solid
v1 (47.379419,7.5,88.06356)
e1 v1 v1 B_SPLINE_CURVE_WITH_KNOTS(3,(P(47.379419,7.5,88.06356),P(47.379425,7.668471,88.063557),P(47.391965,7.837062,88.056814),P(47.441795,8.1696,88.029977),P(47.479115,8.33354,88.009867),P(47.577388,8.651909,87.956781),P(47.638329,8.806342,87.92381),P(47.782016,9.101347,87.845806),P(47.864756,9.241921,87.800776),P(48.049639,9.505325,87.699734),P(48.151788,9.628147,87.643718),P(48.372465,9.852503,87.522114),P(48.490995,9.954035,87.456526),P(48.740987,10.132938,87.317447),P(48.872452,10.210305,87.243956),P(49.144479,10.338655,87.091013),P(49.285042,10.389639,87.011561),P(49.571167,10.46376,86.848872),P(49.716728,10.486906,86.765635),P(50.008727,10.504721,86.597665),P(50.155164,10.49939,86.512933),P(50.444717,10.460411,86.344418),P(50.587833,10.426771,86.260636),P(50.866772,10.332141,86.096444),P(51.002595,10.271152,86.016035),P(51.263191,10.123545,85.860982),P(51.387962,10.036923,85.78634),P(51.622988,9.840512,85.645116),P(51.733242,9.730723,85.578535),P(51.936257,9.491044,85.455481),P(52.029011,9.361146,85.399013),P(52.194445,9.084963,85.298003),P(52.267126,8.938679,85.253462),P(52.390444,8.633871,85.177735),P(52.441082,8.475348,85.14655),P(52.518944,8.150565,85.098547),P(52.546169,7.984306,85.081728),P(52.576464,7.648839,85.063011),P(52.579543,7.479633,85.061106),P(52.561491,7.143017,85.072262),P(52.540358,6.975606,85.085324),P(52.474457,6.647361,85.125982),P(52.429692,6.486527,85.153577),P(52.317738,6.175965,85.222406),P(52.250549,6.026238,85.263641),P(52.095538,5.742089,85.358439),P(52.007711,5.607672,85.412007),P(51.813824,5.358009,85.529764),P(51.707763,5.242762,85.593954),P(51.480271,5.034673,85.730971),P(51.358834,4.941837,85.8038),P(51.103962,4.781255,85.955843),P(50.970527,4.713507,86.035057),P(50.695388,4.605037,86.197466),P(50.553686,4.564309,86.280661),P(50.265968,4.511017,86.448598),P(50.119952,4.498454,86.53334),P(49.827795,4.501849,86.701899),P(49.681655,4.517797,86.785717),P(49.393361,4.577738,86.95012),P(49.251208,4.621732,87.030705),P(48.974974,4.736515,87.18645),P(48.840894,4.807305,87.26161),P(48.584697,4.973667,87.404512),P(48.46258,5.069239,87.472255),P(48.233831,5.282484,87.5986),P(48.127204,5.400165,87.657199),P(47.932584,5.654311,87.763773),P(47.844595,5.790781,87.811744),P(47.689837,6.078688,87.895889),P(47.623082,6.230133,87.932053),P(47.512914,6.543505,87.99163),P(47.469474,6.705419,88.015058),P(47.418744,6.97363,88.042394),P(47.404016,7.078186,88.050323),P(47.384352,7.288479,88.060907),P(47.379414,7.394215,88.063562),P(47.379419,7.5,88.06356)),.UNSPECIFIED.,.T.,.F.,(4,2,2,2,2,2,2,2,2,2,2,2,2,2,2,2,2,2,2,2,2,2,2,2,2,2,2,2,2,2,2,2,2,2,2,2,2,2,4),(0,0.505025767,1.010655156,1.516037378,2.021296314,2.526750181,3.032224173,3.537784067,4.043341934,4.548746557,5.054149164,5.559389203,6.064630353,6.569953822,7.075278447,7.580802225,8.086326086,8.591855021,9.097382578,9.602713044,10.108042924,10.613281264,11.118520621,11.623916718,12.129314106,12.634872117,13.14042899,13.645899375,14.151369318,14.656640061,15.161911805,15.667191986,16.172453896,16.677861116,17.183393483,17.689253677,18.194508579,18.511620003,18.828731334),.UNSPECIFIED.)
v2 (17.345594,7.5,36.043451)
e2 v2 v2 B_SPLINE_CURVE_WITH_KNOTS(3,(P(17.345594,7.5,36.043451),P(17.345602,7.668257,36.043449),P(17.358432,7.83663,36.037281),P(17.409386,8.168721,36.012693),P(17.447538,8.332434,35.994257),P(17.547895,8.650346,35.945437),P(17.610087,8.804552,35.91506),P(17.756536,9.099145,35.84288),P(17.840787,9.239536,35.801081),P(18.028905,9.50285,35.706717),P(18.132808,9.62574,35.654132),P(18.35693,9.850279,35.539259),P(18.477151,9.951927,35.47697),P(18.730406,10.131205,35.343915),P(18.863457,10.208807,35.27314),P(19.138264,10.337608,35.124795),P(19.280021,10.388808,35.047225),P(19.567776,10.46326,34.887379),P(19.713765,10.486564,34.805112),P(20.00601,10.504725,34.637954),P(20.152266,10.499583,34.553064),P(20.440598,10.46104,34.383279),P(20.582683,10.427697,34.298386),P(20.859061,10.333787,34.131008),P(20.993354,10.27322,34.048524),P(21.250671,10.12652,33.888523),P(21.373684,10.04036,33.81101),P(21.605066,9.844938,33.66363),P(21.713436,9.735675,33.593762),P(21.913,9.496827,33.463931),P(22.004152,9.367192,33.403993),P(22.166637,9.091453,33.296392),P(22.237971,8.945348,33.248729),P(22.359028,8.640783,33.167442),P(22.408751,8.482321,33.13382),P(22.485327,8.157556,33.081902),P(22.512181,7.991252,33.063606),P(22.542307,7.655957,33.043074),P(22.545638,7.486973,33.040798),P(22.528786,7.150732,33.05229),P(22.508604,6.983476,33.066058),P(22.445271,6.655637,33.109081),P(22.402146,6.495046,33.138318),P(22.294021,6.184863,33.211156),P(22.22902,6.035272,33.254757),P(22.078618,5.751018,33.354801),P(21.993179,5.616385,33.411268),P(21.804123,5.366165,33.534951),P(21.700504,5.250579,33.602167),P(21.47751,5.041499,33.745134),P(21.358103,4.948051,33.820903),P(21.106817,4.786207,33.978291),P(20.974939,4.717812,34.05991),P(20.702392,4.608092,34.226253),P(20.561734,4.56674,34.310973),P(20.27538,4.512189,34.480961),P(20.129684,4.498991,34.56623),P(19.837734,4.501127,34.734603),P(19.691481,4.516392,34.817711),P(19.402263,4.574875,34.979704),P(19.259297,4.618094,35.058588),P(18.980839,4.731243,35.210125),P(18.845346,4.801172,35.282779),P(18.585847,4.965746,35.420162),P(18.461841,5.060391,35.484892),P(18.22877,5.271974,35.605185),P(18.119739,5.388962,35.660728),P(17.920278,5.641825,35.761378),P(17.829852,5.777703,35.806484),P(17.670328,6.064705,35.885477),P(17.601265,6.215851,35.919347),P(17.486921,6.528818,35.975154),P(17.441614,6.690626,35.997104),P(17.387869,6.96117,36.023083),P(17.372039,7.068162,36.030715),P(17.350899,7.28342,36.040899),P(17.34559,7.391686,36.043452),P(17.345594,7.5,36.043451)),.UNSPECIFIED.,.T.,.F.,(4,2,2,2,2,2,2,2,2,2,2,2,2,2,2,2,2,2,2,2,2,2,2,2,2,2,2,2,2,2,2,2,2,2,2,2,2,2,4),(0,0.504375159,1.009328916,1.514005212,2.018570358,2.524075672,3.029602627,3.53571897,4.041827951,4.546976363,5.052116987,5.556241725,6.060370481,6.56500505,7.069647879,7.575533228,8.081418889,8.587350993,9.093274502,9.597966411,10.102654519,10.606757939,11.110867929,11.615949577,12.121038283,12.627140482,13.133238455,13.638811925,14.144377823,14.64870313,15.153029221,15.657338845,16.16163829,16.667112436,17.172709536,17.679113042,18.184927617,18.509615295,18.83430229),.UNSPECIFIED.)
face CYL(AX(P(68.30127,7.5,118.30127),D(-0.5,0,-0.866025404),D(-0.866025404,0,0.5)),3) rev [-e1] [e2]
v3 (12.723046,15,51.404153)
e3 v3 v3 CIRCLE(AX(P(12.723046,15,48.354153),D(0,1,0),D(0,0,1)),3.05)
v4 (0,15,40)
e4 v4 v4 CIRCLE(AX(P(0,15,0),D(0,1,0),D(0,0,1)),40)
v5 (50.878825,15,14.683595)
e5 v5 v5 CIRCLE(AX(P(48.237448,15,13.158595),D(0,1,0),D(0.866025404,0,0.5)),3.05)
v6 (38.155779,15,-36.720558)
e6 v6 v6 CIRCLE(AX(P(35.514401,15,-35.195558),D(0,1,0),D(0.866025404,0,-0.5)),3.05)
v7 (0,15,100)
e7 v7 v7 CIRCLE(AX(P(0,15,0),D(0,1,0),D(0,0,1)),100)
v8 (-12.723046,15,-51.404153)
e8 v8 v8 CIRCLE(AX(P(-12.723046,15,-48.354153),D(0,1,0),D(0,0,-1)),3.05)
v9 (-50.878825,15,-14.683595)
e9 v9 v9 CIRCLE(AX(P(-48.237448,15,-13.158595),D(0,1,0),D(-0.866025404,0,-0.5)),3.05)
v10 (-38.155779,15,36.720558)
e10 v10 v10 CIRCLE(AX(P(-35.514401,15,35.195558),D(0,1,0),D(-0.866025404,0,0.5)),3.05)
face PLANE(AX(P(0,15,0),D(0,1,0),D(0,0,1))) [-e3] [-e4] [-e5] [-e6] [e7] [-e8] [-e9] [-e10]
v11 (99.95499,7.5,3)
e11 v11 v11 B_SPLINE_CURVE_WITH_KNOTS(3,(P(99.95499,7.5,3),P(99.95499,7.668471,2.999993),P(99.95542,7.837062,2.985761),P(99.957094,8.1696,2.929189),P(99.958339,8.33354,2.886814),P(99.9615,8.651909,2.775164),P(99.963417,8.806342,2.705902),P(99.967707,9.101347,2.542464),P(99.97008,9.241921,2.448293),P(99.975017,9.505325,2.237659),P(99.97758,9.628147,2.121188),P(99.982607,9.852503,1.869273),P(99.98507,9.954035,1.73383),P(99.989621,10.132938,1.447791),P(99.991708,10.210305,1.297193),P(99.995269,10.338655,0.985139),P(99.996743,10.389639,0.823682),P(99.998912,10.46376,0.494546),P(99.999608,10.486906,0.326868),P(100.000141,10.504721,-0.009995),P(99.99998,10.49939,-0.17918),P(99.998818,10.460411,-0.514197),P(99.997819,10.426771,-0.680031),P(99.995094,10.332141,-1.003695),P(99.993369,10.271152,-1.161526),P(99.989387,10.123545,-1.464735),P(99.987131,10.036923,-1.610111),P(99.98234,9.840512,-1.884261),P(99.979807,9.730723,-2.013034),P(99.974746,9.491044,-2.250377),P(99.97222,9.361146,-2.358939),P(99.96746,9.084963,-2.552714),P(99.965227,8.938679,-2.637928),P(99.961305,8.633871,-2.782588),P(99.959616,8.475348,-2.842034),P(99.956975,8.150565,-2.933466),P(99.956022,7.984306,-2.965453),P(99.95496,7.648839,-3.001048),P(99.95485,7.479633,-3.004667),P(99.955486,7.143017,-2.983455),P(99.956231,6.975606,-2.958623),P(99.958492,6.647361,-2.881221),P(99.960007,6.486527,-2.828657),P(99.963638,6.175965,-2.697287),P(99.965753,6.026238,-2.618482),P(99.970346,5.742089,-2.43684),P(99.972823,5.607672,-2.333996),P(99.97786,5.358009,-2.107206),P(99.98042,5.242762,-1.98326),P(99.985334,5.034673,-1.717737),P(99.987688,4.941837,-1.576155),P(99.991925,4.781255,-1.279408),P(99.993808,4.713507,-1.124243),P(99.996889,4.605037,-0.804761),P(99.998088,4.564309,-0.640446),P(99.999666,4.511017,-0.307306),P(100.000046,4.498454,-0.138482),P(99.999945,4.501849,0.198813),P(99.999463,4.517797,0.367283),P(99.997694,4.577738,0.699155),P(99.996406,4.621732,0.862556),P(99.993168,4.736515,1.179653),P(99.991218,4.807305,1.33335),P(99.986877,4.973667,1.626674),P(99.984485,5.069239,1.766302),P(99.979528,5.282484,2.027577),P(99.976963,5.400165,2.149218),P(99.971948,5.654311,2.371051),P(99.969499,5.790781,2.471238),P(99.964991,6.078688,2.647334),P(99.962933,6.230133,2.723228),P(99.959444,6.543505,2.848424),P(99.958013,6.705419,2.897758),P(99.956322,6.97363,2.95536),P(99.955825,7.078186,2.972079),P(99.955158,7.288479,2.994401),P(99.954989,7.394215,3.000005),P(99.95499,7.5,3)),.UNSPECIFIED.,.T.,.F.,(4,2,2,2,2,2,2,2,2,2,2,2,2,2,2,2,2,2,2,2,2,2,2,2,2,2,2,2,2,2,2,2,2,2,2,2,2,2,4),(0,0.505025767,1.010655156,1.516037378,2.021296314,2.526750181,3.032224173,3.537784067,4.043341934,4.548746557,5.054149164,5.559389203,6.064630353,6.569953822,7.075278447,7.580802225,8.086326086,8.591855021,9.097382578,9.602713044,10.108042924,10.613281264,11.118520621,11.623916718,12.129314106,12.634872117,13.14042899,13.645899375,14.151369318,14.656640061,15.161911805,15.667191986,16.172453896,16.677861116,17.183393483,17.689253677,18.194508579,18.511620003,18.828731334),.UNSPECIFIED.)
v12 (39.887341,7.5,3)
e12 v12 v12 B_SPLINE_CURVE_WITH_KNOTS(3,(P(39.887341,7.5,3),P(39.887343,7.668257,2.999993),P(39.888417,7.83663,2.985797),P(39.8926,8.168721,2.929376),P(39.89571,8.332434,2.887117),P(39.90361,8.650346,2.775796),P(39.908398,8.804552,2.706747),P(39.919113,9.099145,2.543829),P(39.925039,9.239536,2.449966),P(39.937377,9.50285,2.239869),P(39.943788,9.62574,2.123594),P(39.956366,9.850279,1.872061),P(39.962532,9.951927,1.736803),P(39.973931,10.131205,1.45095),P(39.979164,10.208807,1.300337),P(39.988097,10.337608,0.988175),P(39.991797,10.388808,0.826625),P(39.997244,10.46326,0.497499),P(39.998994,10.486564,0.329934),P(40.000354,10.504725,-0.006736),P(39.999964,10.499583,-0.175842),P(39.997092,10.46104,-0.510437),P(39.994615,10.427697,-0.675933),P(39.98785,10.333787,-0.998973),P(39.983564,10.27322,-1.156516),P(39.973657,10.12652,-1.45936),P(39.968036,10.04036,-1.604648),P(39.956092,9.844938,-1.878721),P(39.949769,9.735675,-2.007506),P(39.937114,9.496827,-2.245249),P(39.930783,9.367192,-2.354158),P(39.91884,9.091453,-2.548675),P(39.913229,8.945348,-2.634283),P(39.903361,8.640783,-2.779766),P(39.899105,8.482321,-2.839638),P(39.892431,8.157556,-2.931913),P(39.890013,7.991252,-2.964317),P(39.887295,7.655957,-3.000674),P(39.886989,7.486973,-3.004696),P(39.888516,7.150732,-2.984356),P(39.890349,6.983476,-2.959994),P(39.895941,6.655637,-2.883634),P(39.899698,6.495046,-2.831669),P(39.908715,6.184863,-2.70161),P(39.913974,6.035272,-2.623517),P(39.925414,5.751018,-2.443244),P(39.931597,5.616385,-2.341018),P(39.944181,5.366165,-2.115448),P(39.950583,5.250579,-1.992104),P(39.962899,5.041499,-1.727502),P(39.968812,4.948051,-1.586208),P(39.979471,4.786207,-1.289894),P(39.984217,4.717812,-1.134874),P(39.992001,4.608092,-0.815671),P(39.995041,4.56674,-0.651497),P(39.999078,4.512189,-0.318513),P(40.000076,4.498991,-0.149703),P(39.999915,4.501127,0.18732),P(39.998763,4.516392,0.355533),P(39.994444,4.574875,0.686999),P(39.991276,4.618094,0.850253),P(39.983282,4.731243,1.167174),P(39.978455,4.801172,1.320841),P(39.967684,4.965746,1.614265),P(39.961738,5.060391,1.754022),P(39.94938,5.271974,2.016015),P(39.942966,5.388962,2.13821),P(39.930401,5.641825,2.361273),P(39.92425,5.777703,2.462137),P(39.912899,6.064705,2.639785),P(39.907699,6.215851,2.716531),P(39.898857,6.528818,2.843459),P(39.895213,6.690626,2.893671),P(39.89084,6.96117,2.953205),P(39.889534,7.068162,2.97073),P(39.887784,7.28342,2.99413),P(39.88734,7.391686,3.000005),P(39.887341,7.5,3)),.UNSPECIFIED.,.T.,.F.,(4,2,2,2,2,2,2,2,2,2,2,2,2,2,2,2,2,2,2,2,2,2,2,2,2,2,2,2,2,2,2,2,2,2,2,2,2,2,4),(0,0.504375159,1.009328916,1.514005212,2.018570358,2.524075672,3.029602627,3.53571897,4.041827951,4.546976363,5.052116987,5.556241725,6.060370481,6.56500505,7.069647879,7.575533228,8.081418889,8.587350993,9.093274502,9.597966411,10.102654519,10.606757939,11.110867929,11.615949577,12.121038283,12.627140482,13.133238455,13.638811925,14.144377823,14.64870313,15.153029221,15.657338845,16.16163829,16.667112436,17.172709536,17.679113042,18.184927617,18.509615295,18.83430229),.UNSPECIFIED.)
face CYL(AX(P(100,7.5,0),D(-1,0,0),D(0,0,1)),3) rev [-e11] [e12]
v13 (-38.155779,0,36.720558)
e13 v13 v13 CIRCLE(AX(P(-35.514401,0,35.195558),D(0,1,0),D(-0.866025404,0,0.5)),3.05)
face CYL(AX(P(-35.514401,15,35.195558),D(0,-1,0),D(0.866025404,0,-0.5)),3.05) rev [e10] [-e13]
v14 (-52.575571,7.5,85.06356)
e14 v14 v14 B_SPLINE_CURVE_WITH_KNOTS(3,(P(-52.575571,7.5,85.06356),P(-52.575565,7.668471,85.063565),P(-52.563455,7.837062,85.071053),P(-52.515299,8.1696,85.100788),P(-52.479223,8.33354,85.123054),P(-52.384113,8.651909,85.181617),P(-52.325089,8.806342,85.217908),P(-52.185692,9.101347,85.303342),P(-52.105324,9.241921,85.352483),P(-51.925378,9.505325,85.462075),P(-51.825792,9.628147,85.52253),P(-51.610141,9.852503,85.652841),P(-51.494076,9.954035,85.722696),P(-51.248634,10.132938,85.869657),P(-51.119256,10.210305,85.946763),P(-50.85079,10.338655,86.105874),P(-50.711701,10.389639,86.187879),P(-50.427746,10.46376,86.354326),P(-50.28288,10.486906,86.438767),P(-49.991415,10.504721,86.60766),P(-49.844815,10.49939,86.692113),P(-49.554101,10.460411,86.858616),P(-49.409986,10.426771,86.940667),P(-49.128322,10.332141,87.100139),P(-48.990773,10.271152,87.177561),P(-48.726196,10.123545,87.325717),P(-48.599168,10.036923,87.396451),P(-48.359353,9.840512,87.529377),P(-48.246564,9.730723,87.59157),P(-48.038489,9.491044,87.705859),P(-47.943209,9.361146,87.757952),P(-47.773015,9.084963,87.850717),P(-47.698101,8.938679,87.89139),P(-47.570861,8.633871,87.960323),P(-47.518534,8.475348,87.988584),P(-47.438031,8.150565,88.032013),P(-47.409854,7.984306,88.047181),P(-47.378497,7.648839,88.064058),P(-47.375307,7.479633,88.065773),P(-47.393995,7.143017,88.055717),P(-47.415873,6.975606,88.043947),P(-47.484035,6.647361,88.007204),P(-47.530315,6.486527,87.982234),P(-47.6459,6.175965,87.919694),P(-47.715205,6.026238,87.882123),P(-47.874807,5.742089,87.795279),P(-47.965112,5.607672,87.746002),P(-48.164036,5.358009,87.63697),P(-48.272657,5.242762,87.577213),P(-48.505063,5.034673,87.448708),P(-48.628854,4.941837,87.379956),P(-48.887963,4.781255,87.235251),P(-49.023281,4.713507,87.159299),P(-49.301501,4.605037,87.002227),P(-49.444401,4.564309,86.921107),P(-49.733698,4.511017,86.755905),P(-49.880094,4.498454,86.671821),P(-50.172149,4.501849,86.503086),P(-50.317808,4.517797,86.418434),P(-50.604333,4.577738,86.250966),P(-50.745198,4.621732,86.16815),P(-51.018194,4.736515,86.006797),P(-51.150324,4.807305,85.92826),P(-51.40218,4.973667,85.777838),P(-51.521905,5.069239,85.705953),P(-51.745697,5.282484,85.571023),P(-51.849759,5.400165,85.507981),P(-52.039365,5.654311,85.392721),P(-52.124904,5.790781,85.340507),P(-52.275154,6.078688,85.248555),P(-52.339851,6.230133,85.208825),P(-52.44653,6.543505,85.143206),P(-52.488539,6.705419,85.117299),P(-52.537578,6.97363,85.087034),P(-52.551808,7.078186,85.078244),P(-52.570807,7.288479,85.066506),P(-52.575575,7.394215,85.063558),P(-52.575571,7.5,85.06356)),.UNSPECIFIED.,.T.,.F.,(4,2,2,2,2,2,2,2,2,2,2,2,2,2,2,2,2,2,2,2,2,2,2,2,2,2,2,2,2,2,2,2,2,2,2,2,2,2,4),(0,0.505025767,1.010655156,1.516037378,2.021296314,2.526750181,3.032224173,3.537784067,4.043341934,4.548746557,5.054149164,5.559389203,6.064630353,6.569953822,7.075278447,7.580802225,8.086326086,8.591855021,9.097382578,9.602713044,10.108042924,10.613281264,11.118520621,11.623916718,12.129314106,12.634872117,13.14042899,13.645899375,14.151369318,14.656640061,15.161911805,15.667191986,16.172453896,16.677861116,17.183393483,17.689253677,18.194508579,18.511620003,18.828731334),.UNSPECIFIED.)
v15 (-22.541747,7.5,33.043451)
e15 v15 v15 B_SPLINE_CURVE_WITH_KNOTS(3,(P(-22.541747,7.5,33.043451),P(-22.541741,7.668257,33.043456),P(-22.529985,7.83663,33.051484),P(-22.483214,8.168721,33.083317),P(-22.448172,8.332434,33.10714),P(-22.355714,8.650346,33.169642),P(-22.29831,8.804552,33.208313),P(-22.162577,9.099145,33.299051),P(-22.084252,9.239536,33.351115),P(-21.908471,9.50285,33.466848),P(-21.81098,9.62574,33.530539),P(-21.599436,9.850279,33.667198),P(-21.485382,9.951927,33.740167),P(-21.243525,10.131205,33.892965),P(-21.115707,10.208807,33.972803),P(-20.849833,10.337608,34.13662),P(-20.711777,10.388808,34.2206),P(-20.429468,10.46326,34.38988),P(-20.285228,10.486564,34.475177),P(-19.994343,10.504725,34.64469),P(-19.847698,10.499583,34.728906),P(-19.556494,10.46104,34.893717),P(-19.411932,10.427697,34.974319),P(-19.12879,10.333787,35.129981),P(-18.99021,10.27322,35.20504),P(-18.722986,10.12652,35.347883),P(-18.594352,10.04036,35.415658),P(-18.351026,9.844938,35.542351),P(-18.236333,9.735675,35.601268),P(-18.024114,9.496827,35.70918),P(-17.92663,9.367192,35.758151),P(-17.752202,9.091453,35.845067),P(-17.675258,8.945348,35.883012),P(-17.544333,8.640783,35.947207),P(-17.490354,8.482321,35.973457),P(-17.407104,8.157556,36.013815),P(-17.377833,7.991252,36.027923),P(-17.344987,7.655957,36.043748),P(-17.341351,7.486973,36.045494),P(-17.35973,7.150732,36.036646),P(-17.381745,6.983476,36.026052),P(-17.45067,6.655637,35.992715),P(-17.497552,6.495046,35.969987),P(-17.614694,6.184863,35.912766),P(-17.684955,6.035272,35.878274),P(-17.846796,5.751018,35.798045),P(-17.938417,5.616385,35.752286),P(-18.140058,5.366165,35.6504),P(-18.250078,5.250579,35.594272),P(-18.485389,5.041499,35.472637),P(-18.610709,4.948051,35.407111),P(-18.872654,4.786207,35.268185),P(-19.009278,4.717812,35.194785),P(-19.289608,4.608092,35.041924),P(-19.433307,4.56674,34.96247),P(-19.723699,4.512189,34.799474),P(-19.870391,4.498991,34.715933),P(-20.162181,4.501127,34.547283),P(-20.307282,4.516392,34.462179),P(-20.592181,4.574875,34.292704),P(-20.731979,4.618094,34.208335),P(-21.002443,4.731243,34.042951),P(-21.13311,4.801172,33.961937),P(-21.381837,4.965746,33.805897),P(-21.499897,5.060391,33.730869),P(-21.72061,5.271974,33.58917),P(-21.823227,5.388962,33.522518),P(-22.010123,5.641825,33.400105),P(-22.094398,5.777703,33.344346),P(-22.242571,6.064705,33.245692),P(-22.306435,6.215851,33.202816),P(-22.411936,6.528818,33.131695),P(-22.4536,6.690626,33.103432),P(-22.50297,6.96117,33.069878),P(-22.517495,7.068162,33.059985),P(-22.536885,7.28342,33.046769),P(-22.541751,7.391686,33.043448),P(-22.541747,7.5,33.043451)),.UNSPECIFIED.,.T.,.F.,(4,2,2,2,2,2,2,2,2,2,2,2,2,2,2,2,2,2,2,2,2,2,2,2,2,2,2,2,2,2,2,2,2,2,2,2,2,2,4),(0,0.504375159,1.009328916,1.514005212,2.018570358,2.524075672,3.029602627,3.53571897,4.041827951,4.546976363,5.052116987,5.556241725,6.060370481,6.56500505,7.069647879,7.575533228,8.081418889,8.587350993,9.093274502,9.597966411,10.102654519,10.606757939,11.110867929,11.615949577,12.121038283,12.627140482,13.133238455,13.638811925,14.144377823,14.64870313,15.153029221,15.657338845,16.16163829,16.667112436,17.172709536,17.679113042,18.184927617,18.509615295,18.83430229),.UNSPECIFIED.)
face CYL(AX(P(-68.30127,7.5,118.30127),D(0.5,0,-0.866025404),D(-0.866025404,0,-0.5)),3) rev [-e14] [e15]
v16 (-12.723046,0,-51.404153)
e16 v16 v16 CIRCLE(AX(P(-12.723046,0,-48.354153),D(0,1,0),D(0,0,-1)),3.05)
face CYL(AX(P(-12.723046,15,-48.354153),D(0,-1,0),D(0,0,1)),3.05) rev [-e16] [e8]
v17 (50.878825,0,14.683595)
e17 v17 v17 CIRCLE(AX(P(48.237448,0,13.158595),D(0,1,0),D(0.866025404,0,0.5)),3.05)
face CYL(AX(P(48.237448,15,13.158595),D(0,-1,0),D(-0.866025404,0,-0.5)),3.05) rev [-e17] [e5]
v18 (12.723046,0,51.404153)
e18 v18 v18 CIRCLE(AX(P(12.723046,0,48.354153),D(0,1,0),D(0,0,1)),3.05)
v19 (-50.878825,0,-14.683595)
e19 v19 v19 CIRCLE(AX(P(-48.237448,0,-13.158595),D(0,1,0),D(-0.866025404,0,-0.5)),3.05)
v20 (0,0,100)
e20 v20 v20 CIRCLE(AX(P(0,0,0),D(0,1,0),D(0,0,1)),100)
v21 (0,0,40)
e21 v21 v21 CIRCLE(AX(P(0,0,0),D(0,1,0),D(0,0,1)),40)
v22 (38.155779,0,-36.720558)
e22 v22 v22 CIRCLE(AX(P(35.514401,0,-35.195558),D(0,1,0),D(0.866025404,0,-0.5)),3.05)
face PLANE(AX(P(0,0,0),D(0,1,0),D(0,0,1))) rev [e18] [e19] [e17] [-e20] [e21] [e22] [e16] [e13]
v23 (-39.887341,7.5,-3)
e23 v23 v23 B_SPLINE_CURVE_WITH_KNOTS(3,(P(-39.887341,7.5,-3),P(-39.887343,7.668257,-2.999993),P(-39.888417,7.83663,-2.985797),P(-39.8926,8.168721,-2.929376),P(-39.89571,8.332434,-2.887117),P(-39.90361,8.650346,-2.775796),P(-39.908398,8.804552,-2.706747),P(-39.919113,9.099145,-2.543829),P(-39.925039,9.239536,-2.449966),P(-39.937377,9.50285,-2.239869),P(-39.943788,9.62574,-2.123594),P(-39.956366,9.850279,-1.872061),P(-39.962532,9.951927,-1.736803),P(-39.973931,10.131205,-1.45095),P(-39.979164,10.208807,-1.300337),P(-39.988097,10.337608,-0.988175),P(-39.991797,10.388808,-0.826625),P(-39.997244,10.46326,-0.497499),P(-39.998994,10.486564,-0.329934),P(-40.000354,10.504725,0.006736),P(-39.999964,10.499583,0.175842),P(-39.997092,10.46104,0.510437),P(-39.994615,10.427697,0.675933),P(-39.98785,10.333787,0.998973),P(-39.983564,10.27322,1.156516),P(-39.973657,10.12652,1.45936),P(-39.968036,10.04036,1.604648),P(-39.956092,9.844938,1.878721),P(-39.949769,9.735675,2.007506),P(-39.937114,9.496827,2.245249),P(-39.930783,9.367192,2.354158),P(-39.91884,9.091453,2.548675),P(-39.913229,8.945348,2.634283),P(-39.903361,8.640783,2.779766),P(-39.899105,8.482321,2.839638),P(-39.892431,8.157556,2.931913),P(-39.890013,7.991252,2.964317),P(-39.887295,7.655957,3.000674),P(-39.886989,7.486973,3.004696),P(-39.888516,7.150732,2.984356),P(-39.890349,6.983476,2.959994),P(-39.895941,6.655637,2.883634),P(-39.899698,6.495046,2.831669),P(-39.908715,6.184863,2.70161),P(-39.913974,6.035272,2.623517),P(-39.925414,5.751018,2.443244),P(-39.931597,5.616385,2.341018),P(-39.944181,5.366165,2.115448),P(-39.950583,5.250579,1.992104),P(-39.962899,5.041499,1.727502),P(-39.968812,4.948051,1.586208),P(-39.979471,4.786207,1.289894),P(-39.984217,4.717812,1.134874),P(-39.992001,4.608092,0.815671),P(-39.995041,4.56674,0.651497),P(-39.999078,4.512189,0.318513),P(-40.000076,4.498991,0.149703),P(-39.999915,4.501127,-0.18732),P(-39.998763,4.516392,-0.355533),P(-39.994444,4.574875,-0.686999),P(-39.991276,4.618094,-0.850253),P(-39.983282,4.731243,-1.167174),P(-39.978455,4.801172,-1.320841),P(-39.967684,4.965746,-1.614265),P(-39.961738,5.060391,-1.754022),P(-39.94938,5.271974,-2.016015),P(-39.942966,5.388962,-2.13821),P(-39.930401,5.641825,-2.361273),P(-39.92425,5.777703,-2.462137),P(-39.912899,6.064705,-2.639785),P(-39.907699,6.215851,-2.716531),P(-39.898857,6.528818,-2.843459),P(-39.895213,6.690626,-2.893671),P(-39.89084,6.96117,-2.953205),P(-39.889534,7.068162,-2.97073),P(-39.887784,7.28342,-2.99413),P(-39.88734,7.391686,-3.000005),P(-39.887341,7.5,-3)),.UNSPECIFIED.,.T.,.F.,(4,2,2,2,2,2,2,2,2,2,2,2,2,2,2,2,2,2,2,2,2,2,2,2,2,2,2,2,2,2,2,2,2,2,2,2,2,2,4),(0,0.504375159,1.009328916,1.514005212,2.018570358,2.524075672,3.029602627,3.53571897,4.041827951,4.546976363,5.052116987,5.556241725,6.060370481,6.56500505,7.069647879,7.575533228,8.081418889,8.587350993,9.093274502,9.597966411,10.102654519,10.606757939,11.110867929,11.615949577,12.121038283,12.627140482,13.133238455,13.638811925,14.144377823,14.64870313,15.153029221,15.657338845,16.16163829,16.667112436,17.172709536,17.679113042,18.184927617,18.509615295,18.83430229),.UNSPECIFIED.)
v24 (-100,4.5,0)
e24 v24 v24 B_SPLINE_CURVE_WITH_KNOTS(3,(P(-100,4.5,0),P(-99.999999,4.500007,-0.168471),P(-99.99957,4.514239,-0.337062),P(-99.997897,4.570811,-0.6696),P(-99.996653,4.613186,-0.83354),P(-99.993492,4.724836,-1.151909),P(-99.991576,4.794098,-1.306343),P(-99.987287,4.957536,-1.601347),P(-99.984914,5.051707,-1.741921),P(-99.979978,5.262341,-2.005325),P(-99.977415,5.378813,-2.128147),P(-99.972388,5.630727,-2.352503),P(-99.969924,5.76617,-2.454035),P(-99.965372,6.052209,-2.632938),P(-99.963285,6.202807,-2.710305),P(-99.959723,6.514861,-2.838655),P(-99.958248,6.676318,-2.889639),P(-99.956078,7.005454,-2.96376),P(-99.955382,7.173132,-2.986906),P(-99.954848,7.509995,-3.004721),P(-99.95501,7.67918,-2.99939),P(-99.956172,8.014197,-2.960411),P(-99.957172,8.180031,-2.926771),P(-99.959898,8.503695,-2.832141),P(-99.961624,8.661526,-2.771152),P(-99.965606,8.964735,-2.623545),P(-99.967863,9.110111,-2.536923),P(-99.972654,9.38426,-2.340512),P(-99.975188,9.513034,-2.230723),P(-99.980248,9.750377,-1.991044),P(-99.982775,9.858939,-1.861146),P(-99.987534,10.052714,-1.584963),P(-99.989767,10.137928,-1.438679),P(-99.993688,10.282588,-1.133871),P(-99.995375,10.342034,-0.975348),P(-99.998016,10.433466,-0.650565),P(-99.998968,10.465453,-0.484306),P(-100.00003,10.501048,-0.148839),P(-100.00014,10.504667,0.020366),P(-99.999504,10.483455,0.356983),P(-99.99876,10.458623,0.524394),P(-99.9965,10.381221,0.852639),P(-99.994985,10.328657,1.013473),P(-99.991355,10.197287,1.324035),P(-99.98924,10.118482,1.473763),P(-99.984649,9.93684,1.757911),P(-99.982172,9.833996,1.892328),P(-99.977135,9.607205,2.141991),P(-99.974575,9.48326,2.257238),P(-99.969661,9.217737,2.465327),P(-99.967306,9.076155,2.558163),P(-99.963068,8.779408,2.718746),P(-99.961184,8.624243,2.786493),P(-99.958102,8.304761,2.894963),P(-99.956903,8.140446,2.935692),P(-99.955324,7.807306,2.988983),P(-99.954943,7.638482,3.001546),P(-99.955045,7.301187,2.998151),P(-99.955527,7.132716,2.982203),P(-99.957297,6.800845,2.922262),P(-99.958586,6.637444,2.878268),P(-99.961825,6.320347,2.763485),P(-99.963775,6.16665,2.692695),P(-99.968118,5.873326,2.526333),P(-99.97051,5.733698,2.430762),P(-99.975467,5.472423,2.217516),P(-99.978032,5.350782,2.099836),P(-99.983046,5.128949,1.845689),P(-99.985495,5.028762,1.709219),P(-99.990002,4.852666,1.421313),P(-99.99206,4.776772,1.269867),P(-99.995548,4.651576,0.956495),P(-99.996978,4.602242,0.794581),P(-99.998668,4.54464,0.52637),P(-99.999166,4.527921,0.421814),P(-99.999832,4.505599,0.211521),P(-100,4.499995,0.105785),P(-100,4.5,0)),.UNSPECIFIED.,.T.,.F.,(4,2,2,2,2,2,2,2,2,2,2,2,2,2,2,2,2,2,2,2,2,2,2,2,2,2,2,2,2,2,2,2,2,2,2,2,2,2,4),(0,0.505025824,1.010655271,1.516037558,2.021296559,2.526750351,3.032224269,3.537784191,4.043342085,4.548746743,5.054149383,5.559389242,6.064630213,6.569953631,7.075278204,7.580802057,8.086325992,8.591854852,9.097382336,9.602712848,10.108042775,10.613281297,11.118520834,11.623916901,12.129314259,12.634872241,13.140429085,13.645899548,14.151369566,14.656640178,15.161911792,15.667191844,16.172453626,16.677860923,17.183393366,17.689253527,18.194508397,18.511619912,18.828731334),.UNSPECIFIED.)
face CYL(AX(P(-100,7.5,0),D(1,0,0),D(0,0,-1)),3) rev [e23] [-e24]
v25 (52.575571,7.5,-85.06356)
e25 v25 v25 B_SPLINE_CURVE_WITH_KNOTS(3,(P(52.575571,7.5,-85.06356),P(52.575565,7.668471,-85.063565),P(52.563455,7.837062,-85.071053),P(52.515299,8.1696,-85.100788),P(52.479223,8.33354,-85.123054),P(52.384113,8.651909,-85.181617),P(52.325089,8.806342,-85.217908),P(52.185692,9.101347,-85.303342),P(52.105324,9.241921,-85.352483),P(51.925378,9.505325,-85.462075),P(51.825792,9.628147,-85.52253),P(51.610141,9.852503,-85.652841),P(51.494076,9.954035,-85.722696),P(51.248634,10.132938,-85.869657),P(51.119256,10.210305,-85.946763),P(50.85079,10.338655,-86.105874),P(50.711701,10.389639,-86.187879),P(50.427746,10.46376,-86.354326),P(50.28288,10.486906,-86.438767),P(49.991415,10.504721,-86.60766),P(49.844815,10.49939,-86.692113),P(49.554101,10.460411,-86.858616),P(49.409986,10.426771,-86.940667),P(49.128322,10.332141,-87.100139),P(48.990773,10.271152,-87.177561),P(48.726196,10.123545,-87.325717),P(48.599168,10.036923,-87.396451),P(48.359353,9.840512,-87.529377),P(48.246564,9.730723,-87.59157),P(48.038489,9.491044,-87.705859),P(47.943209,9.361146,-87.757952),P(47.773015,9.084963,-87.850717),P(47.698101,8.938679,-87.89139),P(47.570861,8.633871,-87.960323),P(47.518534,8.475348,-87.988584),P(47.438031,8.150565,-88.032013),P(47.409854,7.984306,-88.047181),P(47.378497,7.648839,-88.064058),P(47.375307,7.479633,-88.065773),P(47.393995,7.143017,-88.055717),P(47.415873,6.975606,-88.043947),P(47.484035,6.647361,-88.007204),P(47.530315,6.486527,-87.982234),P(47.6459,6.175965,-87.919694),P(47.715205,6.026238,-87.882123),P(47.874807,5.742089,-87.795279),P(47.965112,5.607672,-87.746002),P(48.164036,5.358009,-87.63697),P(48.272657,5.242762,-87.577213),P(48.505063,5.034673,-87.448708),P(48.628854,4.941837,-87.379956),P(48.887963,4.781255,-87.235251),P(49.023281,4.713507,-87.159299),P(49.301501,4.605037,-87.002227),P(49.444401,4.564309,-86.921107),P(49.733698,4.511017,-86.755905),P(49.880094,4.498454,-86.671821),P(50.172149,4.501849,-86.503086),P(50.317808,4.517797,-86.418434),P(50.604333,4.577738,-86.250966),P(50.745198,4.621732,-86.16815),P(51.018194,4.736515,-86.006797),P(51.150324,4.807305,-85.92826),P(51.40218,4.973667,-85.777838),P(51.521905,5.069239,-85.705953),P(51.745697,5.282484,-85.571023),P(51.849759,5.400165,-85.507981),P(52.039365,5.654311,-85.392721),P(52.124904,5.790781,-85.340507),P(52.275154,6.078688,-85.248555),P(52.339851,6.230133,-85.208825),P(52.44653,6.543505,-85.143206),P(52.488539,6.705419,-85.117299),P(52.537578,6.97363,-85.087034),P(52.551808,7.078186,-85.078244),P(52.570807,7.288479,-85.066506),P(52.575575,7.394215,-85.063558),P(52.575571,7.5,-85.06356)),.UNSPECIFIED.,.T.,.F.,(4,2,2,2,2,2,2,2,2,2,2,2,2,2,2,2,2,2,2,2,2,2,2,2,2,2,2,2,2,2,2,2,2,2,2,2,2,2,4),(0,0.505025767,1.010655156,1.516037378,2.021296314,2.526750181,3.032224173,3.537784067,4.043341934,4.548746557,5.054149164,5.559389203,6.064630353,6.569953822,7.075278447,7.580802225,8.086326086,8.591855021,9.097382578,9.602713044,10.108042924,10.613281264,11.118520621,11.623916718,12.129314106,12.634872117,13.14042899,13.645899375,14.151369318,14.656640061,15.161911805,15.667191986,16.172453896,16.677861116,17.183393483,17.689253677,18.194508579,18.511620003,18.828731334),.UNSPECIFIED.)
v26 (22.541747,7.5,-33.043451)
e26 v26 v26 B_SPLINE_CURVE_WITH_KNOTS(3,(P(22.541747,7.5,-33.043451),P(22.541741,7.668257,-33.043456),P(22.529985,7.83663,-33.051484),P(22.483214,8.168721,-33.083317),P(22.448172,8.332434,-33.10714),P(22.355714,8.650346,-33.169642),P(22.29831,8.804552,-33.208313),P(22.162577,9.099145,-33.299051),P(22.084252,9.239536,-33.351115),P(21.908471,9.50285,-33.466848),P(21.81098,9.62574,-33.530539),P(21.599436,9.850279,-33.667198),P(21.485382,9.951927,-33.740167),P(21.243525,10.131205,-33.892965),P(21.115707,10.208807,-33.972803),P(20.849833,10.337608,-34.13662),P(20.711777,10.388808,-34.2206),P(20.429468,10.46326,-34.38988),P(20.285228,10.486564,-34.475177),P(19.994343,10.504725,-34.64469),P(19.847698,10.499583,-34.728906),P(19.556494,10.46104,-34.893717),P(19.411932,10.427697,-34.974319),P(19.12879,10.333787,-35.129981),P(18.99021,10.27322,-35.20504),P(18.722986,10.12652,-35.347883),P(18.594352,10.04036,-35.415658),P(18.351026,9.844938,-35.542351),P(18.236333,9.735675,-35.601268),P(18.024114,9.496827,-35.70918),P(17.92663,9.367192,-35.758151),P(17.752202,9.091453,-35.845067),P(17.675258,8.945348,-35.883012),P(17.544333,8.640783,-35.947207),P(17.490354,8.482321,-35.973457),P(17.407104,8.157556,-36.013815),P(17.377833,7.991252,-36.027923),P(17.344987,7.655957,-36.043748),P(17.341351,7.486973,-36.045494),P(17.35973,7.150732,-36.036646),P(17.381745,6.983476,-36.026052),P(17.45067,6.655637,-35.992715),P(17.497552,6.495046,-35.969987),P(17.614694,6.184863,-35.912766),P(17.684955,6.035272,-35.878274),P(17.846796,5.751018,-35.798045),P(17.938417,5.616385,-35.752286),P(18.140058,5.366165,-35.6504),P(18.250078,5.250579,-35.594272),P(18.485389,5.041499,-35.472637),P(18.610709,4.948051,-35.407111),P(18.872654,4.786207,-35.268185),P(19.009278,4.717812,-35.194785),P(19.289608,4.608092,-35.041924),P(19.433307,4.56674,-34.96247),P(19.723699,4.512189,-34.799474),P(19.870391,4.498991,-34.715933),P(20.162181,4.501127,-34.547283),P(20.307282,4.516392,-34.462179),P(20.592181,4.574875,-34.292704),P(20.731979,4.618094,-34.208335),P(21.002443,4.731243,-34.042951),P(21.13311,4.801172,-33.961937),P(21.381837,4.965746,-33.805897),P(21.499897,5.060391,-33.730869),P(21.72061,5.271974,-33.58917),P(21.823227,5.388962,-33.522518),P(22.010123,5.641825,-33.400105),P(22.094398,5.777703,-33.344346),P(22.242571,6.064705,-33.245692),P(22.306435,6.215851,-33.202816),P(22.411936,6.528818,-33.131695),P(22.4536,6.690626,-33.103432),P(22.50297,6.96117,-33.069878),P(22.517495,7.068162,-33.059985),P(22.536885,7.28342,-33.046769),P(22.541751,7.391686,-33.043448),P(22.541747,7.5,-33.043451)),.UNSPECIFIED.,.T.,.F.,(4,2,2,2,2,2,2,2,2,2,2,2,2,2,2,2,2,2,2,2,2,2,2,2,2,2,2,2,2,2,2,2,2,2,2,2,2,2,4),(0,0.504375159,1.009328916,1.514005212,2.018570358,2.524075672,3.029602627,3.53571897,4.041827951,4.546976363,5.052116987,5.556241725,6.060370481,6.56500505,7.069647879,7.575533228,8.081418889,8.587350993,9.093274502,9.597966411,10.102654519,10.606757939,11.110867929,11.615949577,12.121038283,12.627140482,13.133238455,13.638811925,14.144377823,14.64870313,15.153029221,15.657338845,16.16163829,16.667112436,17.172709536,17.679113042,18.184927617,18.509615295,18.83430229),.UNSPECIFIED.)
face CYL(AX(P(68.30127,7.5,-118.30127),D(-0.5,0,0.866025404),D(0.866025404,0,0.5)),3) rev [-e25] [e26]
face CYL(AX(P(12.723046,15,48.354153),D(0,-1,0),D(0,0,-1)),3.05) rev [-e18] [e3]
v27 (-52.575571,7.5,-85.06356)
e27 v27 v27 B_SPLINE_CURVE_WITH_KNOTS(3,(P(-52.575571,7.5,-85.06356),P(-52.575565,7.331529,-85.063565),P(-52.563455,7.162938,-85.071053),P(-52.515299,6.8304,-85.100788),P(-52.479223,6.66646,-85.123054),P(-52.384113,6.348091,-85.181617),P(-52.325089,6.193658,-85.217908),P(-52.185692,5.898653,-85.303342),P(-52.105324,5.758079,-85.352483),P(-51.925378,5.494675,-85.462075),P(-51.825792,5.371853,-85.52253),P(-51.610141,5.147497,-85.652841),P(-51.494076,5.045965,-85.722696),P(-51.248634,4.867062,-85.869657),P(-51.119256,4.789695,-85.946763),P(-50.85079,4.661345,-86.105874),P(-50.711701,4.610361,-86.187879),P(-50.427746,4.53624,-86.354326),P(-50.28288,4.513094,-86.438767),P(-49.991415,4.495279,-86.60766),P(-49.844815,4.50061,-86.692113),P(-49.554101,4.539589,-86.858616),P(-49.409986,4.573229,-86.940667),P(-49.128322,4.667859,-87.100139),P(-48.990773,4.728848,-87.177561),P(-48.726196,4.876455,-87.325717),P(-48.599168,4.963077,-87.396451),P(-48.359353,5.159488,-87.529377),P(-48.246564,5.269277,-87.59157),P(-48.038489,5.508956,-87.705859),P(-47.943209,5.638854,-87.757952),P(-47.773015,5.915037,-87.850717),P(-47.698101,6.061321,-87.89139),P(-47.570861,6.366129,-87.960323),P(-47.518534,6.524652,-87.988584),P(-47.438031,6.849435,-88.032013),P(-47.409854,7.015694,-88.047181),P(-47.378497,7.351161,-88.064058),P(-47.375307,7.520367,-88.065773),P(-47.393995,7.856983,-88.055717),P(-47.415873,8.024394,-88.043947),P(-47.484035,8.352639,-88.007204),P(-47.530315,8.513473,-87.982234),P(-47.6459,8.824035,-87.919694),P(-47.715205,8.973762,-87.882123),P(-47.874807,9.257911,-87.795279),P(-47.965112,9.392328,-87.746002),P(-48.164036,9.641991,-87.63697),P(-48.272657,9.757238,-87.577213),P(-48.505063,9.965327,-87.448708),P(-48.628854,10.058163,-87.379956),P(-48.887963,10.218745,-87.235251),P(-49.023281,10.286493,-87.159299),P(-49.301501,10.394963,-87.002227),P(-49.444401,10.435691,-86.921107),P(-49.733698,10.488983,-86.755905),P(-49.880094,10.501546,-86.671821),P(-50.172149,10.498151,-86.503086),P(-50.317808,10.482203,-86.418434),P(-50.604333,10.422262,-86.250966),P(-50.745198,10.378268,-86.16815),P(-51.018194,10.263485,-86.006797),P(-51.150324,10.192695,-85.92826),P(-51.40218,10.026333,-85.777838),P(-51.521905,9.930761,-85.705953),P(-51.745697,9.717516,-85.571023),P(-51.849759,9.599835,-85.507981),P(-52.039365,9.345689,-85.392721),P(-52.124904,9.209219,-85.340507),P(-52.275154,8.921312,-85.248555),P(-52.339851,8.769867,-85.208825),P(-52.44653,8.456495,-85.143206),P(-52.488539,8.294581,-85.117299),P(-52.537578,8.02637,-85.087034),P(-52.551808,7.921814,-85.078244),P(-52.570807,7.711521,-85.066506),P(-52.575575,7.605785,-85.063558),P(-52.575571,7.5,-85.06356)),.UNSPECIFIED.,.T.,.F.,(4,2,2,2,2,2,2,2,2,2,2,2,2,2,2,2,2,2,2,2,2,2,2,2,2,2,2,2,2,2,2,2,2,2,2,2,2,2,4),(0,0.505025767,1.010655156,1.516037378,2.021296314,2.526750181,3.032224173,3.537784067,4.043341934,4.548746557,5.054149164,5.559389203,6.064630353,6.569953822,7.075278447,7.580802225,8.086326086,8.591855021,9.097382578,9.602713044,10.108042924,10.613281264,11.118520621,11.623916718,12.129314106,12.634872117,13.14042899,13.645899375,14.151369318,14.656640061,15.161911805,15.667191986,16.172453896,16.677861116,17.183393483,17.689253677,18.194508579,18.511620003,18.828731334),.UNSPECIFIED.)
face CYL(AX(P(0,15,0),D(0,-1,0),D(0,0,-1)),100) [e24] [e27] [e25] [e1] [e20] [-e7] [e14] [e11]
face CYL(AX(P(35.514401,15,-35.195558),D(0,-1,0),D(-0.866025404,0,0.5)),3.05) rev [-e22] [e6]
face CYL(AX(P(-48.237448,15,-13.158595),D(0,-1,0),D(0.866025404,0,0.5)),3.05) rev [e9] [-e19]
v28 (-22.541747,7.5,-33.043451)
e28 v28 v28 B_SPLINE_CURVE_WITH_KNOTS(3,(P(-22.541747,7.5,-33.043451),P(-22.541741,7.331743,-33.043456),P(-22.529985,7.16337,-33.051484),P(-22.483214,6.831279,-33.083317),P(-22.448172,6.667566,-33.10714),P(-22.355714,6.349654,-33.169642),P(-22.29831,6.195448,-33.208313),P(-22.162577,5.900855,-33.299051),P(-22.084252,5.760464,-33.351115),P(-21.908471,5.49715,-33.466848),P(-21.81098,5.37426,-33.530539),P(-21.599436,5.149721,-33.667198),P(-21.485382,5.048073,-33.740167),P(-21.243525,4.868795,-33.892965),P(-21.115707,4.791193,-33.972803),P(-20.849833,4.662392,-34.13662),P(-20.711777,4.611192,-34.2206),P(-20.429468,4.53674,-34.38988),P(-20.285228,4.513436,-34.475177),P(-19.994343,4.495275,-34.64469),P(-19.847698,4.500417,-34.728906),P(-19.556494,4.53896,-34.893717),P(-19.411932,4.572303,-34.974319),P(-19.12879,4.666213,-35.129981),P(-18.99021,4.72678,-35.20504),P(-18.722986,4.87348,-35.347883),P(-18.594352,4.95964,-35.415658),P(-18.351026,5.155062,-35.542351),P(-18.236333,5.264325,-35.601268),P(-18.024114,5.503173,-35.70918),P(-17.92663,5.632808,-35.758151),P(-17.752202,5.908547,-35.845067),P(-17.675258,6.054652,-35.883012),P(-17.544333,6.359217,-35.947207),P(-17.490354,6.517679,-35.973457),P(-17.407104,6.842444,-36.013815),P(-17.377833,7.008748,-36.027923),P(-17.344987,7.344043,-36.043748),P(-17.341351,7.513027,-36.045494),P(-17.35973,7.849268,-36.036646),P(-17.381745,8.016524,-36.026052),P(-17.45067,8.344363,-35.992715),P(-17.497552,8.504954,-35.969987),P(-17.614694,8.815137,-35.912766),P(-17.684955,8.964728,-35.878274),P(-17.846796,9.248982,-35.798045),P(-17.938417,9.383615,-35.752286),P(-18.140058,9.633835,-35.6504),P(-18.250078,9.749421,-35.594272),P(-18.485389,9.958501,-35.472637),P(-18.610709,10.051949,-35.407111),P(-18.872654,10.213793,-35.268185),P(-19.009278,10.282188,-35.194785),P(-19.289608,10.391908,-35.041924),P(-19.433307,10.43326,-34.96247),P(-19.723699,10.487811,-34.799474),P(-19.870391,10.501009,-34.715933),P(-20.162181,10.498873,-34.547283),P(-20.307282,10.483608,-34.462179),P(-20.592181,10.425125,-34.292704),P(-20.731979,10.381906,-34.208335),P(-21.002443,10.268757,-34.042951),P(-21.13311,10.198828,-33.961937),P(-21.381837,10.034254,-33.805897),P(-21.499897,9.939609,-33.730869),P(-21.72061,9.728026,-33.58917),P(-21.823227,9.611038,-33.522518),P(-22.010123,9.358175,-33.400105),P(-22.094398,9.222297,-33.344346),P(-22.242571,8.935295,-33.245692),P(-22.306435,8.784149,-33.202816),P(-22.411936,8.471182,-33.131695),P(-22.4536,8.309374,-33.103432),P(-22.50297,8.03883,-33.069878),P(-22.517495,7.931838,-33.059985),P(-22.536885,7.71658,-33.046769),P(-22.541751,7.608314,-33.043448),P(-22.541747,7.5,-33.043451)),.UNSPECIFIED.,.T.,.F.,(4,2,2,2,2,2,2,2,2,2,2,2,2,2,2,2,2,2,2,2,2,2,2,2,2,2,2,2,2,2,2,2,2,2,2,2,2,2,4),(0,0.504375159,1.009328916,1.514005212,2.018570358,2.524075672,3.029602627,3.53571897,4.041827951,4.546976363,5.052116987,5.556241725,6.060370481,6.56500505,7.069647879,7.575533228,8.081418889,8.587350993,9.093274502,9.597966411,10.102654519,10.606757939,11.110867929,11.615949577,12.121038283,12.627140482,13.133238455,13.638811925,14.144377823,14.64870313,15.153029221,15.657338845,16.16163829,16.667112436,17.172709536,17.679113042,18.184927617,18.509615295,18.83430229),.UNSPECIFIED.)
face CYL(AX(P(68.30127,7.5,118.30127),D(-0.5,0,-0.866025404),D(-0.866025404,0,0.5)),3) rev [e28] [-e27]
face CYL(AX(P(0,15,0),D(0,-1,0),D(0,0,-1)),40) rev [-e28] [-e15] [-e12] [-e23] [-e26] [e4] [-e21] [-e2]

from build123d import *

# Parameters (mm, degrees)
SKETCH1_R             = 100
SKETCH1_R_2           = 40
SKETCH1_R_3           = 3.05
BOSS_EXTRUDE1_DEPTH   = 15
SKETCH2_R             = 3
CUT_EXTRUDE1_DEPTH    = 143.214626533
CIRPATTERN1_COUNT     = 6
CIRPATTERN2_OUTLINE_R = 3.05
CIRPATTERN2_DEPTH     = 15


# Read off the part's stored shape, not the designer's step: CirPattern2
with BuildPart() as part:
    # Sketch1 → Boss-Extrude1 (new body)
    with BuildSketch(Plane(origin=(0, 0, 0), x_dir=(1, 0, 0), z_dir=(0, 1, 0))):
        with Locations(Location((0, 0, 0), (0, 0, 270))):
            Circle(SKETCH1_R)
        with Locations(Location((0, 0, 0), (0, 0, 270))):
            Circle(SKETCH1_R_2, mode=Mode.SUBTRACT)
        with Locations(Location((12.723046489, -48.354152749, 0), (0, 0, 270))):
            Circle(SKETCH1_R_3, mode=Mode.SUBTRACT)
    extrude(amount=BOSS_EXTRUDE1_DEPTH)

    # Sketch2 → Cut-Extrude1 (cut, through all)
    with BuildSketch(Plane(origin=(0, 0, 0), x_dir=(0, 0, -1), z_dir=(1, 0, 0))):
        with Locations((0, 7.5)):
            Circle(SKETCH2_R)
    cut_extrude1 = extrude(amount=-CUT_EXTRUDE1_DEPTH, mode=Mode.SUBTRACT)

    # CirPattern1: Cut-Extrude1 ×6 about axis
    cirpattern1_axis = Axis((0, 15, 0), (0, 1, 0))
    for i in range(1, CIRPATTERN1_COUNT):
        add(cut_extrude1.rotate(cirpattern1_axis, i * 360 / CIRPATTERN1_COUNT), mode=Mode.SUBTRACT)

    # CirPattern2 outline → CirPattern2 (cut)
    with BuildSketch(Plane(origin=(0, 0, 0), x_dir=(1, 0, 0), z_dir=(0, 1, 0))):
        with Locations((-35.514401414, -35.195557847)):
            Circle(CIRPATTERN2_OUTLINE_R)
        with Locations((-48.237447903, 13.158594901)):
            Circle(CIRPATTERN2_OUTLINE_R)
        with Locations((-12.723046489, 48.354152749)):
            Circle(CIRPATTERN2_OUTLINE_R)
        with Locations((35.514401414, 35.195557847)):
            Circle(CIRPATTERN2_OUTLINE_R)
        with Locations((48.237447903, -13.158594901)):
            Circle(CIRPATTERN2_OUTLINE_R)
    extrude(amount=CIRPATTERN2_DEPTH, mode=Mode.SUBTRACT)


solid = part.part
